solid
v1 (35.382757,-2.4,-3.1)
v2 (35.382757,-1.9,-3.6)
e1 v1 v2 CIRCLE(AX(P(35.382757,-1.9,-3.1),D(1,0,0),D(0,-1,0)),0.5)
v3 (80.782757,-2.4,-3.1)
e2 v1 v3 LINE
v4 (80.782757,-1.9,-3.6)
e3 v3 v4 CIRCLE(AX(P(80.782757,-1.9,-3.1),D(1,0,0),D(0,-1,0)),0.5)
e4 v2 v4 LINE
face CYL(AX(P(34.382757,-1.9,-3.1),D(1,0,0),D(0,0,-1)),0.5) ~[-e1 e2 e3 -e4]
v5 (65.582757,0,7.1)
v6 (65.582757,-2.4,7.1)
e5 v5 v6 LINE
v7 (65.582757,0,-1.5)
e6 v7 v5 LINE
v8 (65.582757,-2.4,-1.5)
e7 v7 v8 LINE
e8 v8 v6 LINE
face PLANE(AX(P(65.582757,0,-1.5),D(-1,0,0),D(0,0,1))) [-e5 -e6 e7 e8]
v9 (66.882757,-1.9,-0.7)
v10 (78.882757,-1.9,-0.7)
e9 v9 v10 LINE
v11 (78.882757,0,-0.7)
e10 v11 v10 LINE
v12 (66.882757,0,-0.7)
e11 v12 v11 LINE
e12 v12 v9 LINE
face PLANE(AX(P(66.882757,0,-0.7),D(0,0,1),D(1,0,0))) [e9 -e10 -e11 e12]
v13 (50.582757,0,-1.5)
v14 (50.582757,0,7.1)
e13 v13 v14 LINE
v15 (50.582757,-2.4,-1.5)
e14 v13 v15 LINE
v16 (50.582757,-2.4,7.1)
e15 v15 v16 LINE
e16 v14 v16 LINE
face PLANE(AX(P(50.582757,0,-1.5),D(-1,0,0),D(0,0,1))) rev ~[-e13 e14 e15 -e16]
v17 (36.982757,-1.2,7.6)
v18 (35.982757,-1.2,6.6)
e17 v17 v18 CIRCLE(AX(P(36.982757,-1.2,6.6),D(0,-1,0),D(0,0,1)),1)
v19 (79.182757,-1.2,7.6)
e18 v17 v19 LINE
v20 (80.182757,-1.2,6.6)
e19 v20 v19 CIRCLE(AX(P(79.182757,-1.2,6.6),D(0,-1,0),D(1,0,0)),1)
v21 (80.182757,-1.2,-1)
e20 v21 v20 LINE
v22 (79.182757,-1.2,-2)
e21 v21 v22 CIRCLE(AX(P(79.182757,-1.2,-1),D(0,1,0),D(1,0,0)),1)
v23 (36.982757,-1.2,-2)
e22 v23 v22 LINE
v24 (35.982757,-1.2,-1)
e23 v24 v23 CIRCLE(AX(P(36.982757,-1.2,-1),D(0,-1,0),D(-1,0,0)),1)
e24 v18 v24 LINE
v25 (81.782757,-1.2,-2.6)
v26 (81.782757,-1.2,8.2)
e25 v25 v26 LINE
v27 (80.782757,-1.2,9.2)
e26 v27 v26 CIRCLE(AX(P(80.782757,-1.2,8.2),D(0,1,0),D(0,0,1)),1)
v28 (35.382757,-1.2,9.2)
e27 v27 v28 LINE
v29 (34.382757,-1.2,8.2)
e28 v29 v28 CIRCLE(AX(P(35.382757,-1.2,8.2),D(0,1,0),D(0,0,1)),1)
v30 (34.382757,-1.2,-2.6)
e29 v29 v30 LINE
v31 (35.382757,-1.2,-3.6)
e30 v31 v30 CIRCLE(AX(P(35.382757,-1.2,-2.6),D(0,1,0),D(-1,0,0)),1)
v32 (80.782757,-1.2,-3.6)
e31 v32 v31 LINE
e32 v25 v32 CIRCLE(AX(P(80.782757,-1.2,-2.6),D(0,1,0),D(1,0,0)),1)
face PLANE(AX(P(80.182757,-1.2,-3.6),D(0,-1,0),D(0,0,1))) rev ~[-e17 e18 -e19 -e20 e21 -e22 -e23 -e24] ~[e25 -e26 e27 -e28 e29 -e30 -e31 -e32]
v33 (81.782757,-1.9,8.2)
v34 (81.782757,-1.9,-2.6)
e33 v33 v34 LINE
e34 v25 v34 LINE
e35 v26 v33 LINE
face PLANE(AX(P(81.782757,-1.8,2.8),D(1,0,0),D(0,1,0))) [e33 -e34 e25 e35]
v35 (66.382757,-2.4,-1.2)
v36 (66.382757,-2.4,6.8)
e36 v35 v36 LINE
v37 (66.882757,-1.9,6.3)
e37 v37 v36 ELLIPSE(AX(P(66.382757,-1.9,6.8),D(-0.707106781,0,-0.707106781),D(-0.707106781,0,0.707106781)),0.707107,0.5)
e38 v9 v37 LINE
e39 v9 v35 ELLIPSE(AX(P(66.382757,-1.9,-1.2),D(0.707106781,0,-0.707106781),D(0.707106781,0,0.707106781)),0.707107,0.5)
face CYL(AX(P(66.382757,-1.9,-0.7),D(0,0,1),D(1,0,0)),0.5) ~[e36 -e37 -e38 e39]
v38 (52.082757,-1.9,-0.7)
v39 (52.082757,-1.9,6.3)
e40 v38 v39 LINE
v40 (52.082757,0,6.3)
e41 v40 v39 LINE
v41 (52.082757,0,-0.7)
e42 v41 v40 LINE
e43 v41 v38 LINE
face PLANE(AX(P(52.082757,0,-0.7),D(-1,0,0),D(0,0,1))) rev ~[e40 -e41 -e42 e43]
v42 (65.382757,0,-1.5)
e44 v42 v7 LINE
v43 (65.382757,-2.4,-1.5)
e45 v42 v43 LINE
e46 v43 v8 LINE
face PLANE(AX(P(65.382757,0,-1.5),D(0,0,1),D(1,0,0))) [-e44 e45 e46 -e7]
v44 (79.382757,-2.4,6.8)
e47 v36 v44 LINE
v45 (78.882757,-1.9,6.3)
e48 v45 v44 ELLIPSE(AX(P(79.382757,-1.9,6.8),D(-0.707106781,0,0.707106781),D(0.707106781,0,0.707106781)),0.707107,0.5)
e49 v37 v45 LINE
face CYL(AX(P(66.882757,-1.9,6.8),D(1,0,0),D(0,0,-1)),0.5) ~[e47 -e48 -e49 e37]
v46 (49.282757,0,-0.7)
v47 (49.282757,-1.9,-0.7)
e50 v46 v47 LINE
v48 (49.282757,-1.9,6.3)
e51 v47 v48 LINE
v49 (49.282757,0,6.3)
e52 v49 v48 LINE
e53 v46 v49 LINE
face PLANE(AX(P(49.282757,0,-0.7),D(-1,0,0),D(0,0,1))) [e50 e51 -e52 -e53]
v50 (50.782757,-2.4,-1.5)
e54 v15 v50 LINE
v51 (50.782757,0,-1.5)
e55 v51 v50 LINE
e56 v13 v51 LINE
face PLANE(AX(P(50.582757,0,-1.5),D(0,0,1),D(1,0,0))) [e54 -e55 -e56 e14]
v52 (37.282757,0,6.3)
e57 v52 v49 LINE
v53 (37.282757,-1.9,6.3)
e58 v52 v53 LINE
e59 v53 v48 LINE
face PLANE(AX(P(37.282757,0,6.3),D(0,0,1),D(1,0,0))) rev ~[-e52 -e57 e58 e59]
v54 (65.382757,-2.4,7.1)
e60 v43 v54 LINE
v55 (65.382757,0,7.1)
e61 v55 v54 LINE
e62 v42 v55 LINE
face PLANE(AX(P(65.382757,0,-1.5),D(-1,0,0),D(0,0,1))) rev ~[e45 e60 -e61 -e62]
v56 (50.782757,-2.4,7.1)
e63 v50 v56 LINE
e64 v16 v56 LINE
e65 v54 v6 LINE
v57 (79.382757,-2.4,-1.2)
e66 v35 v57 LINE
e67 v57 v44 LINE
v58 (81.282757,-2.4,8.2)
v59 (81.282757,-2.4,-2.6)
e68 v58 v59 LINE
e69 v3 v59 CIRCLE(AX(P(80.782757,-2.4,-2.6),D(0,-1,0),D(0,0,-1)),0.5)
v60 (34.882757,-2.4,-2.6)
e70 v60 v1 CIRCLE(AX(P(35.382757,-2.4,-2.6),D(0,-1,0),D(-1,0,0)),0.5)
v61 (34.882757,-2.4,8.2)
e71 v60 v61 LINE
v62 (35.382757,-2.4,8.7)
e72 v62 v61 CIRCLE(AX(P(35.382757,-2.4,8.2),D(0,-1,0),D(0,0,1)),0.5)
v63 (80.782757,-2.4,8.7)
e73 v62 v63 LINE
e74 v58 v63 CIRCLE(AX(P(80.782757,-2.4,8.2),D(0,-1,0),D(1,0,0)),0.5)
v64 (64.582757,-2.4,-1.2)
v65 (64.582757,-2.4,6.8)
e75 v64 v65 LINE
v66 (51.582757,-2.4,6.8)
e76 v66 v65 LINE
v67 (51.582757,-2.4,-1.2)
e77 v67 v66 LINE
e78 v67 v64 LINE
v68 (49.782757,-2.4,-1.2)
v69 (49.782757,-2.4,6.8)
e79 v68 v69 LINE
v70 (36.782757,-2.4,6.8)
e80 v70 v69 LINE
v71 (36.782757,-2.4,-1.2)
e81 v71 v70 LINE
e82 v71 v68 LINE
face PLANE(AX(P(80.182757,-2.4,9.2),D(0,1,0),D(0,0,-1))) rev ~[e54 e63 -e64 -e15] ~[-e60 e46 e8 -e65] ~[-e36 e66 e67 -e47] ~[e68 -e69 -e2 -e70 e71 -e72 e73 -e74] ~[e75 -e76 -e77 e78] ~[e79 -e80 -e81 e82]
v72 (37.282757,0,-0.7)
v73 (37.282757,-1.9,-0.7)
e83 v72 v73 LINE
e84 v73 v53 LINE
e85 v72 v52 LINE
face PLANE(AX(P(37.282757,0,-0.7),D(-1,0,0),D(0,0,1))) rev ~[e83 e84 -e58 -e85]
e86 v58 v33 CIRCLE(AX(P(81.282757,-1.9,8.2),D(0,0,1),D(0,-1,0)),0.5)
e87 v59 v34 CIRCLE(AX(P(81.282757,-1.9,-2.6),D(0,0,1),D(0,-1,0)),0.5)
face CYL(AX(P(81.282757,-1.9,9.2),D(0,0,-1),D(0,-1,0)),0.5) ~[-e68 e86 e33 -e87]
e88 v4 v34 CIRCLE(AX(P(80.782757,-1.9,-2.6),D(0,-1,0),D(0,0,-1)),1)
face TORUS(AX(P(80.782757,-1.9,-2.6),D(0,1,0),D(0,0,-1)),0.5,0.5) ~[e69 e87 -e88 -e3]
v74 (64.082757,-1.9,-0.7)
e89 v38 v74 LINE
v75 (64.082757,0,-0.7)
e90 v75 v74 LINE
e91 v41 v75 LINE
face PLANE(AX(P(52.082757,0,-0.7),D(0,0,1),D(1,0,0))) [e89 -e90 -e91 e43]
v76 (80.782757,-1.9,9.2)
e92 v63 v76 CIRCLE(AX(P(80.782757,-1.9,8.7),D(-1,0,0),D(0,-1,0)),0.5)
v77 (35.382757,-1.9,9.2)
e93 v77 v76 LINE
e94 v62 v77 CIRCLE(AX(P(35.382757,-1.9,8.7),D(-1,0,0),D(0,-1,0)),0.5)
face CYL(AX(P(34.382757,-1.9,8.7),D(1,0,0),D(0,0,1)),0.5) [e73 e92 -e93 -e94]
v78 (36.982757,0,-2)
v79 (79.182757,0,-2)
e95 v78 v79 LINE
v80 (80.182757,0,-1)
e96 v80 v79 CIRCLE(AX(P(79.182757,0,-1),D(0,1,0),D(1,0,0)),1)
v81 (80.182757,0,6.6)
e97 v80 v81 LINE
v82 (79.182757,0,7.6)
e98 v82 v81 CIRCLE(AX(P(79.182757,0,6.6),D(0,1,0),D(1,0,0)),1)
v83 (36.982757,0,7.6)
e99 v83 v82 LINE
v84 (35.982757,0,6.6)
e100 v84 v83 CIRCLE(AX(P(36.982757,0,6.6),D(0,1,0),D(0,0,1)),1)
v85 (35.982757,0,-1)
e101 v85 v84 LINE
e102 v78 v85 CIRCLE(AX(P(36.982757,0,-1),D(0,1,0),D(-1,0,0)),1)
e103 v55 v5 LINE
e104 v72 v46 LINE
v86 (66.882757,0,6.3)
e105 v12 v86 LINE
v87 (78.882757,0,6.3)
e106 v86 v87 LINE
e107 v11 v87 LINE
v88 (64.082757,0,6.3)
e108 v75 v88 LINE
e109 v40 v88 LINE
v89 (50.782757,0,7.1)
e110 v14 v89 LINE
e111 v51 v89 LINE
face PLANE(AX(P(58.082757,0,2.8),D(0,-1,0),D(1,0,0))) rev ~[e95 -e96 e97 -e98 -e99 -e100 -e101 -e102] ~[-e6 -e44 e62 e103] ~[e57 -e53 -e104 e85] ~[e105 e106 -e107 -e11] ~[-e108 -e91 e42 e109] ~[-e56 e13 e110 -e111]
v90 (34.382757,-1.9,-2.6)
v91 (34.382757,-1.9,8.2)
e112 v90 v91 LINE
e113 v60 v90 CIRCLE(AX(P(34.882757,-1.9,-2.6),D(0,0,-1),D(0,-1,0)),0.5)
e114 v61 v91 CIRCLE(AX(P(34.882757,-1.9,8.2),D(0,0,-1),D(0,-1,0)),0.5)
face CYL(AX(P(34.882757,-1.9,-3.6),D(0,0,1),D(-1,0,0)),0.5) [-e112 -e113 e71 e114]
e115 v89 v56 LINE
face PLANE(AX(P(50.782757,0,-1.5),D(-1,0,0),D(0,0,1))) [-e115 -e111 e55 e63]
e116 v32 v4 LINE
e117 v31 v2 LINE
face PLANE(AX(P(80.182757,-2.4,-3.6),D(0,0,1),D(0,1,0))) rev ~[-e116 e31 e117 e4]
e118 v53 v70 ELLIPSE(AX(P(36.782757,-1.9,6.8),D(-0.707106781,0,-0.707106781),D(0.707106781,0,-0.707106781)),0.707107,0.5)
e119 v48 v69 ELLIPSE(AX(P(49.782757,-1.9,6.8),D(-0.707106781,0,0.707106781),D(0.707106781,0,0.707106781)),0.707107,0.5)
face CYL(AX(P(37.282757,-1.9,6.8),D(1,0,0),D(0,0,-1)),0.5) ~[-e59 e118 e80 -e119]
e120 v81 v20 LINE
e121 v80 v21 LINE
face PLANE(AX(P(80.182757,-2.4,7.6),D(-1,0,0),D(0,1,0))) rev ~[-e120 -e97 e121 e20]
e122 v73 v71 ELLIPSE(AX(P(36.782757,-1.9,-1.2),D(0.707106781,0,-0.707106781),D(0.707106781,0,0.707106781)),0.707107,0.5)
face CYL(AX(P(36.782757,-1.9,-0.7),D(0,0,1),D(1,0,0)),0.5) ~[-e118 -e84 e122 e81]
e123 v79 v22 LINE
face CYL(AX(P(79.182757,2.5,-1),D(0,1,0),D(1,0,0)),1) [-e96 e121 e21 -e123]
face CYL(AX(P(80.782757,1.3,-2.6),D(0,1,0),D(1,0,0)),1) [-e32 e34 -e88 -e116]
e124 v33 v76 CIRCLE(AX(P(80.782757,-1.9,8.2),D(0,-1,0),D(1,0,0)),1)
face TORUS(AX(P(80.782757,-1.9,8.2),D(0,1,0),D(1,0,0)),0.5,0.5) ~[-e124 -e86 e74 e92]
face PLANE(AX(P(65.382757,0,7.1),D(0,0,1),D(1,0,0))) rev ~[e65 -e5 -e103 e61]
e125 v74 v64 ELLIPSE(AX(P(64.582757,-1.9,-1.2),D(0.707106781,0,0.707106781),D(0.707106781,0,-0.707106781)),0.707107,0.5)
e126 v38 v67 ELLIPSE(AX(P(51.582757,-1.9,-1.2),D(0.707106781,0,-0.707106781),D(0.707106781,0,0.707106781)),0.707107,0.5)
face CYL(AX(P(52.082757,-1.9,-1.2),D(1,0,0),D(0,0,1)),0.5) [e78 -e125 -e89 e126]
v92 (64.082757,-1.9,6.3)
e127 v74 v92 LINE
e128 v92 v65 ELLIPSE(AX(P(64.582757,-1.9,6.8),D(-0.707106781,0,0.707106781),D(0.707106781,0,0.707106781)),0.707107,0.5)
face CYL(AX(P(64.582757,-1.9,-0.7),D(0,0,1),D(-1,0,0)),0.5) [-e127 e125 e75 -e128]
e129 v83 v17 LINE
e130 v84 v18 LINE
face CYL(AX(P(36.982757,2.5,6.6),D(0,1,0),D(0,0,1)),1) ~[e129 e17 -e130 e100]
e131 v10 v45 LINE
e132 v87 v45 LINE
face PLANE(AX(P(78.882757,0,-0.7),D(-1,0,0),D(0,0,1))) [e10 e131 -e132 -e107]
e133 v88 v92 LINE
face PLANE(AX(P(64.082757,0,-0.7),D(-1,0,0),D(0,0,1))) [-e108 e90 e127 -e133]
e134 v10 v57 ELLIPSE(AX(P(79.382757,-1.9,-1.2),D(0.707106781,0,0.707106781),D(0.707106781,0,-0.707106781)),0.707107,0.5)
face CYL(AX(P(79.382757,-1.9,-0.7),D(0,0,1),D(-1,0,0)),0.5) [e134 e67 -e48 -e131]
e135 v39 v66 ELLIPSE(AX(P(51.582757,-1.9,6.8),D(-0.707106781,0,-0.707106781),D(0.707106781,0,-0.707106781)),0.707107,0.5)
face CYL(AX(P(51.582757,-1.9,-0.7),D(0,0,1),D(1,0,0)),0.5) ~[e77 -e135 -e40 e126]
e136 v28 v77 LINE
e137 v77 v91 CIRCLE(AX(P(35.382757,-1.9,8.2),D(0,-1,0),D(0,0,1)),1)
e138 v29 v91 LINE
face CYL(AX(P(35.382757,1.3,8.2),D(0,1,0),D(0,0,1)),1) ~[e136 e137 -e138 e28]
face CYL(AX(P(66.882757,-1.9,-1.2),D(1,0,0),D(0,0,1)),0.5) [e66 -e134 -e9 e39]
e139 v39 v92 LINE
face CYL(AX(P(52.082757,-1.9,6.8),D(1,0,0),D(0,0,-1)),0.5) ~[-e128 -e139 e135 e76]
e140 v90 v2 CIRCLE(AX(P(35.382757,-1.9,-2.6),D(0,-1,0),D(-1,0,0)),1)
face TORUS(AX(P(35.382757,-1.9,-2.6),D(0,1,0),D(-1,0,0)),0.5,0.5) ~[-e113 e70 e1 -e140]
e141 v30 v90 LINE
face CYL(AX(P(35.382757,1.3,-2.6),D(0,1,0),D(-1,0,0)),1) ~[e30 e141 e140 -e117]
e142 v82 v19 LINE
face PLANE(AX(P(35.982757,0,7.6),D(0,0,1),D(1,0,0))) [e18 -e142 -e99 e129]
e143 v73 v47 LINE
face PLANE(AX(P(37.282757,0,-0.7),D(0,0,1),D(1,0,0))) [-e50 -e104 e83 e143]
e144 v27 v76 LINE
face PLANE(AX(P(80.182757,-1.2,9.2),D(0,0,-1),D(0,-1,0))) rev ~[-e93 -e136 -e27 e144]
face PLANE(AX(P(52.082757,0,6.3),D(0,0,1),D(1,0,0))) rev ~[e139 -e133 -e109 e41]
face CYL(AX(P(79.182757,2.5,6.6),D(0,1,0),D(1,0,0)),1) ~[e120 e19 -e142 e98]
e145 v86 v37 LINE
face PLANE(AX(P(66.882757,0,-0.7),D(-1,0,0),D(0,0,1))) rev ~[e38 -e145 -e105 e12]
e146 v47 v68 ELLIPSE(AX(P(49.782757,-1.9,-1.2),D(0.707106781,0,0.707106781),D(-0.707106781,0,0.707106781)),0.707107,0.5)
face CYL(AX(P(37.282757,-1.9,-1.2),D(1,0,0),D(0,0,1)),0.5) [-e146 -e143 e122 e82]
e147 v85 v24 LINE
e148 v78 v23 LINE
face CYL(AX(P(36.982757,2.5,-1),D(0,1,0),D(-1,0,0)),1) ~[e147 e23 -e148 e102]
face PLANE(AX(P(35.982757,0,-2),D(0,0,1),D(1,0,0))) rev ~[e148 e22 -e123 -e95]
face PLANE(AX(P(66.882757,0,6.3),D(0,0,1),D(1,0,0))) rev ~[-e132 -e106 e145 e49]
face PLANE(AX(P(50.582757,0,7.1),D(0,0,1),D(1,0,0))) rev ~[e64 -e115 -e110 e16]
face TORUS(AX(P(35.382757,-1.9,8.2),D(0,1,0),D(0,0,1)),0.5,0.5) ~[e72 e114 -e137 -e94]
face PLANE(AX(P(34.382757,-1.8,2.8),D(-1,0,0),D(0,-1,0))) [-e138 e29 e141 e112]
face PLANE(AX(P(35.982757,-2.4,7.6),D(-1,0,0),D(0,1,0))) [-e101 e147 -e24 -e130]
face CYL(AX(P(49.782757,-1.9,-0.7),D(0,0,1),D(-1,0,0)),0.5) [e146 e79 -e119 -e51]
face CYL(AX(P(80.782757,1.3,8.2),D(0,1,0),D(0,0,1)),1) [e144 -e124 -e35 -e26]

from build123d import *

# Parameters (mm, degrees)
F0_W          = 44.2
F0_H          = 9.6
F0_W_2        = 12
F0_H_2        = 7
F0_W_3        = 0.2
F0_H_3        = 8.6
F1_DEPTH      = 2.4
F2_R          = 0.5
F3_W          = 44.2
F3_H          = 1.2
F4_DEPTH      = 1.6
F5_W          = 44.2
F5_H          = 1.2
F6_DEPTH      = 1.6
F8_DEPTH      = 1.6
F10_DEPTH     = 1.6
F11_R         = 0.5
F12_T1_DEPTH  = 3.7
F12_T3_DEPTH  = 3.7
F12_T6_ANGLE  = 90
F12_T8_ANGLE  = 90
F12_T10_ANGLE = 90
F12_T12_ANGLE = 90


# Not quite as in the source:
# - a fillet or chamfer that OpenCascade refuses, or shapes differently, is made with other operations: its cross-section is extruded or revolved along the edge and cut away or added
# - a feature names something its author has since deleted; it is built from what else it names


with BuildPart() as f1:
    # F0 (on Front) → F1 (new body)
    with BuildSketch(Plane.XZ):
        with Locations((58.0827572465, 2.8)):
            Rectangle(F0_W, F0_H)
        with Locations((43.2827572465, 2.8)):
            Rectangle(F0_W_2, F0_H_2, mode=Mode.SUBTRACT)
        with Locations((50.6827572465, 2.8)):
            Rectangle(F0_W_3, F0_H_3, mode=Mode.SUBTRACT)
        with Locations((58.0827572465, 2.8)):
            Rectangle(F0_W_2, F0_H_2, mode=Mode.SUBTRACT)
        with Locations((65.4827572465, 2.8)):
            Rectangle(F0_W_3, F0_H_3, mode=Mode.SUBTRACT)
        with Locations((72.8827572465, 2.8)):
            Rectangle(F0_W_2, F0_H_2, mode=Mode.SUBTRACT)
    extrude(amount=F1_DEPTH)

    # F2
    f2_edges = [f1.edges().sort_by_distance(p)[0] for p in [
        (43.282757, -2.4, 6.3),
        (37.282757, -2.4, 2.8),
        (49.282757, -2.4, 2.8),
        (58.082757, -2.4, 6.3),
        (52.082757, -2.4, 2.8),
        (58.082757, -2.4, -0.7),
        (43.282757, -2.4, -0.7),
        (64.082757, -2.4, 2.8),
        (66.882757, -2.4, 2.8),
        (72.882757, -2.4, -0.7),
        (72.882757, -2.4, 6.3),
        (78.882757, -2.4, 2.8),
    ]]
    fillet(f2_edges, radius=F2_R)

    # F3 (on face) → F4 (join)
    with BuildSketch(Plane(origin=(0, 0, -2), x_dir=(1, 0, 0), z_dir=(0, 0, -1))):
        with Locations((58.0827572465, 1.8)):
            Rectangle(F3_W, F3_H)
    extrude(amount=F4_DEPTH)

    # F5 (on face) → F6 (join)
    with BuildSketch(Plane.XY.offset(7.6)):
        with Locations((58.0827572465, -1.8)):
            Rectangle(F5_W, F5_H)
    extrude(amount=F6_DEPTH)

    # F7 (on face) → F8 (join)
    with BuildSketch(Plane(origin=(35.9827572465, 0, 0), x_dir=(0, -1, 0), z_dir=(-1, 0, 0))):
        Polygon((2.4, -3.6), (2.4, 9.2), (1.2, 9.2), (1.2, 7.6), (1.2, -2), (1.2, -3.6), align=None)
    extrude(amount=F8_DEPTH)

    # F9 (on face) → F10 (join)
    with BuildSketch(Plane.YZ.offset(80.1827572465)):
        Polygon((-1.2, 9.2), (-2.4, 9.2), (-2.4, -3.6), (-1.2, -3.6), (-1.2, -2), (-1.2, 7.6), align=None)
    extrude(amount=F10_DEPTH)

    # F11
    f11_edges = [f1.edges().sort_by_distance(p)[0] for p in [
        (58.082757, -2.4, 9.2),
        (81.782757, -2.4, 2.8),
        (58.082757, -2.4, -3.6),
        (34.382757, -2.4, 2.8),
    ]]
    fillet(f11_edges, radius=F11_R)

    # F12: fillet of radius 1 on 8 edges, made by hand

    # F12_s2 → F12_t1 (cut)
    with BuildSketch(Plane.XZ.offset(-2.5)):
        with BuildLine():
            ThreePointArc((36.9827572465, 7.6), (36.2756504653, 7.3071067812), (35.9827572465, 6.6))
            Line((35.9827572465, 6.6), (35.9827572465, 7.6))
            Line((35.9827572465, 7.6), (36.9827572465, 7.6))
        make_face()
        with BuildLine():
            ThreePointArc((35.9827572465, -1), (36.2756504653, -1.7071067812), (36.9827572465, -2))
            Line((36.9827572465, -2), (35.9827572465, -2))
            Line((35.9827572465, -2), (35.9827572465, -1))
        make_face()
        with BuildLine():
            ThreePointArc((80.1827572465, -1), (79.8898640277, -1.7071067812), (79.1827572465, -2))
            Line((79.1827572465, -2), (80.1827572465, -2))
            Line((80.1827572465, -2), (80.1827572465, -1))
        make_face()
        with BuildLine():
            ThreePointArc((80.1827572465, 6.6), (79.8898640277, 7.3071067812), (79.1827572465, 7.6))
            Line((79.1827572465, 7.6), (80.1827572465, 7.6))
            Line((80.1827572465, 7.6), (80.1827572465, 6.6))
        make_face()
    extrude(amount=F12_T1_DEPTH, mode=Mode.SUBTRACT)

    # F12_s4 → F12_t3 (cut)
    with BuildSketch(Plane.XZ.offset(-1.3)):
        with BuildLine():
            ThreePointArc((80.7827572465, 9.2), (81.4898640277, 8.9071067812), (81.7827572465, 8.2))
            Line((81.7827572465, 8.2), (81.7827572465, 9.2))
            Line((81.7827572465, 9.2), (80.7827572465, 9.2))
        make_face()
        with BuildLine():
            ThreePointArc((81.7827572465, -2.6), (81.4898640277, -3.3071067812), (80.7827572465, -3.6))
            Line((80.7827572465, -3.6), (81.7827572465, -3.6))
            Line((81.7827572465, -3.6), (81.7827572465, -2.6))
        make_face()
        with BuildLine():
            ThreePointArc((34.3827572465, -2.6), (34.6756504653, -3.3071067812), (35.3827572465, -3.6))
            Line((35.3827572465, -3.6), (34.3827572465, -3.6))
            Line((34.3827572465, -3.6), (34.3827572465, -2.6))
        make_face()
        with BuildLine():
            ThreePointArc((35.3827572465, 9.2), (34.6756504653, 8.9071067812), (34.3827572465, 8.2))
            Line((34.3827572465, 8.2), (34.3827572465, 9.2))
            Line((34.3827572465, 9.2), (35.3827572465, 9.2))
        make_face()
    extrude(amount=F12_T3_DEPTH, mode=Mode.SUBTRACT)

    # F12_s5 → F12_t6 (revolve, cut)
    with BuildSketch(Plane.YZ.offset(35.3827572465)):
        with BuildLine():
            ThreePointArc((-2.4, 8.7), (-2.2535533906, 9.0535533906), (-1.9, 9.2))
            Line((-1.9, 9.2), (-2.4, 9.2))
            Line((-2.4, 9.2), (-2.4, 8.7))
        make_face()
    revolve(axis=Axis((35.3827572465, -2.4, 8.2), (0, -1, 0)), revolution_arc=F12_T6_ANGLE, mode=Mode.SUBTRACT)

    # F12_s7 → F12_t8 (revolve, cut)
    with BuildSketch(Plane.XY.offset(-2.6)):
        with BuildLine():
            ThreePointArc((34.8827572465, -2.4), (34.5292038559, -2.2535533906), (34.3827572465, -1.9))
            Line((34.3827572465, -1.9), (34.3827572465, -2.4))
            Line((34.3827572465, -2.4), (34.8827572465, -2.4))
        make_face()
    revolve(axis=Axis((35.3827572465, -2.4, -2.6), (0, -1, 0)), revolution_arc=F12_T8_ANGLE, mode=Mode.SUBTRACT)

    # F12_s9 → F12_t10 (revolve, cut)
    with BuildSketch(Plane.YZ.offset(80.7827572465)):
        with BuildLine():
            ThreePointArc((-2.4, -3.1), (-2.2535533906, -3.4535533906), (-1.9, -3.6))
            Line((-1.9, -3.6), (-2.4, -3.6))
            Line((-2.4, -3.6), (-2.4, -3.1))
        make_face()
    revolve(axis=Axis((80.7827572465, -2.4, -2.6), (0, -1, 0)), revolution_arc=F12_T10_ANGLE, mode=Mode.SUBTRACT)

    # F12_s11 → F12_t12 (revolve, cut)
    with BuildSketch(Plane.XY.offset(8.2)):
        with BuildLine():
            ThreePointArc((81.2827572465, -2.4), (81.6363106371, -2.2535533906), (81.7827572465, -1.9))
            Line((81.7827572465, -1.9), (81.7827572465, -2.4))
            Line((81.7827572465, -2.4), (81.2827572465, -2.4))
        make_face()
    revolve(axis=Axis((80.7827572465, -2.4, 8.2), (0, -1, 0)), revolution_arc=F12_T12_ANGLE, mode=Mode.SUBTRACT)


solid = f1.part
